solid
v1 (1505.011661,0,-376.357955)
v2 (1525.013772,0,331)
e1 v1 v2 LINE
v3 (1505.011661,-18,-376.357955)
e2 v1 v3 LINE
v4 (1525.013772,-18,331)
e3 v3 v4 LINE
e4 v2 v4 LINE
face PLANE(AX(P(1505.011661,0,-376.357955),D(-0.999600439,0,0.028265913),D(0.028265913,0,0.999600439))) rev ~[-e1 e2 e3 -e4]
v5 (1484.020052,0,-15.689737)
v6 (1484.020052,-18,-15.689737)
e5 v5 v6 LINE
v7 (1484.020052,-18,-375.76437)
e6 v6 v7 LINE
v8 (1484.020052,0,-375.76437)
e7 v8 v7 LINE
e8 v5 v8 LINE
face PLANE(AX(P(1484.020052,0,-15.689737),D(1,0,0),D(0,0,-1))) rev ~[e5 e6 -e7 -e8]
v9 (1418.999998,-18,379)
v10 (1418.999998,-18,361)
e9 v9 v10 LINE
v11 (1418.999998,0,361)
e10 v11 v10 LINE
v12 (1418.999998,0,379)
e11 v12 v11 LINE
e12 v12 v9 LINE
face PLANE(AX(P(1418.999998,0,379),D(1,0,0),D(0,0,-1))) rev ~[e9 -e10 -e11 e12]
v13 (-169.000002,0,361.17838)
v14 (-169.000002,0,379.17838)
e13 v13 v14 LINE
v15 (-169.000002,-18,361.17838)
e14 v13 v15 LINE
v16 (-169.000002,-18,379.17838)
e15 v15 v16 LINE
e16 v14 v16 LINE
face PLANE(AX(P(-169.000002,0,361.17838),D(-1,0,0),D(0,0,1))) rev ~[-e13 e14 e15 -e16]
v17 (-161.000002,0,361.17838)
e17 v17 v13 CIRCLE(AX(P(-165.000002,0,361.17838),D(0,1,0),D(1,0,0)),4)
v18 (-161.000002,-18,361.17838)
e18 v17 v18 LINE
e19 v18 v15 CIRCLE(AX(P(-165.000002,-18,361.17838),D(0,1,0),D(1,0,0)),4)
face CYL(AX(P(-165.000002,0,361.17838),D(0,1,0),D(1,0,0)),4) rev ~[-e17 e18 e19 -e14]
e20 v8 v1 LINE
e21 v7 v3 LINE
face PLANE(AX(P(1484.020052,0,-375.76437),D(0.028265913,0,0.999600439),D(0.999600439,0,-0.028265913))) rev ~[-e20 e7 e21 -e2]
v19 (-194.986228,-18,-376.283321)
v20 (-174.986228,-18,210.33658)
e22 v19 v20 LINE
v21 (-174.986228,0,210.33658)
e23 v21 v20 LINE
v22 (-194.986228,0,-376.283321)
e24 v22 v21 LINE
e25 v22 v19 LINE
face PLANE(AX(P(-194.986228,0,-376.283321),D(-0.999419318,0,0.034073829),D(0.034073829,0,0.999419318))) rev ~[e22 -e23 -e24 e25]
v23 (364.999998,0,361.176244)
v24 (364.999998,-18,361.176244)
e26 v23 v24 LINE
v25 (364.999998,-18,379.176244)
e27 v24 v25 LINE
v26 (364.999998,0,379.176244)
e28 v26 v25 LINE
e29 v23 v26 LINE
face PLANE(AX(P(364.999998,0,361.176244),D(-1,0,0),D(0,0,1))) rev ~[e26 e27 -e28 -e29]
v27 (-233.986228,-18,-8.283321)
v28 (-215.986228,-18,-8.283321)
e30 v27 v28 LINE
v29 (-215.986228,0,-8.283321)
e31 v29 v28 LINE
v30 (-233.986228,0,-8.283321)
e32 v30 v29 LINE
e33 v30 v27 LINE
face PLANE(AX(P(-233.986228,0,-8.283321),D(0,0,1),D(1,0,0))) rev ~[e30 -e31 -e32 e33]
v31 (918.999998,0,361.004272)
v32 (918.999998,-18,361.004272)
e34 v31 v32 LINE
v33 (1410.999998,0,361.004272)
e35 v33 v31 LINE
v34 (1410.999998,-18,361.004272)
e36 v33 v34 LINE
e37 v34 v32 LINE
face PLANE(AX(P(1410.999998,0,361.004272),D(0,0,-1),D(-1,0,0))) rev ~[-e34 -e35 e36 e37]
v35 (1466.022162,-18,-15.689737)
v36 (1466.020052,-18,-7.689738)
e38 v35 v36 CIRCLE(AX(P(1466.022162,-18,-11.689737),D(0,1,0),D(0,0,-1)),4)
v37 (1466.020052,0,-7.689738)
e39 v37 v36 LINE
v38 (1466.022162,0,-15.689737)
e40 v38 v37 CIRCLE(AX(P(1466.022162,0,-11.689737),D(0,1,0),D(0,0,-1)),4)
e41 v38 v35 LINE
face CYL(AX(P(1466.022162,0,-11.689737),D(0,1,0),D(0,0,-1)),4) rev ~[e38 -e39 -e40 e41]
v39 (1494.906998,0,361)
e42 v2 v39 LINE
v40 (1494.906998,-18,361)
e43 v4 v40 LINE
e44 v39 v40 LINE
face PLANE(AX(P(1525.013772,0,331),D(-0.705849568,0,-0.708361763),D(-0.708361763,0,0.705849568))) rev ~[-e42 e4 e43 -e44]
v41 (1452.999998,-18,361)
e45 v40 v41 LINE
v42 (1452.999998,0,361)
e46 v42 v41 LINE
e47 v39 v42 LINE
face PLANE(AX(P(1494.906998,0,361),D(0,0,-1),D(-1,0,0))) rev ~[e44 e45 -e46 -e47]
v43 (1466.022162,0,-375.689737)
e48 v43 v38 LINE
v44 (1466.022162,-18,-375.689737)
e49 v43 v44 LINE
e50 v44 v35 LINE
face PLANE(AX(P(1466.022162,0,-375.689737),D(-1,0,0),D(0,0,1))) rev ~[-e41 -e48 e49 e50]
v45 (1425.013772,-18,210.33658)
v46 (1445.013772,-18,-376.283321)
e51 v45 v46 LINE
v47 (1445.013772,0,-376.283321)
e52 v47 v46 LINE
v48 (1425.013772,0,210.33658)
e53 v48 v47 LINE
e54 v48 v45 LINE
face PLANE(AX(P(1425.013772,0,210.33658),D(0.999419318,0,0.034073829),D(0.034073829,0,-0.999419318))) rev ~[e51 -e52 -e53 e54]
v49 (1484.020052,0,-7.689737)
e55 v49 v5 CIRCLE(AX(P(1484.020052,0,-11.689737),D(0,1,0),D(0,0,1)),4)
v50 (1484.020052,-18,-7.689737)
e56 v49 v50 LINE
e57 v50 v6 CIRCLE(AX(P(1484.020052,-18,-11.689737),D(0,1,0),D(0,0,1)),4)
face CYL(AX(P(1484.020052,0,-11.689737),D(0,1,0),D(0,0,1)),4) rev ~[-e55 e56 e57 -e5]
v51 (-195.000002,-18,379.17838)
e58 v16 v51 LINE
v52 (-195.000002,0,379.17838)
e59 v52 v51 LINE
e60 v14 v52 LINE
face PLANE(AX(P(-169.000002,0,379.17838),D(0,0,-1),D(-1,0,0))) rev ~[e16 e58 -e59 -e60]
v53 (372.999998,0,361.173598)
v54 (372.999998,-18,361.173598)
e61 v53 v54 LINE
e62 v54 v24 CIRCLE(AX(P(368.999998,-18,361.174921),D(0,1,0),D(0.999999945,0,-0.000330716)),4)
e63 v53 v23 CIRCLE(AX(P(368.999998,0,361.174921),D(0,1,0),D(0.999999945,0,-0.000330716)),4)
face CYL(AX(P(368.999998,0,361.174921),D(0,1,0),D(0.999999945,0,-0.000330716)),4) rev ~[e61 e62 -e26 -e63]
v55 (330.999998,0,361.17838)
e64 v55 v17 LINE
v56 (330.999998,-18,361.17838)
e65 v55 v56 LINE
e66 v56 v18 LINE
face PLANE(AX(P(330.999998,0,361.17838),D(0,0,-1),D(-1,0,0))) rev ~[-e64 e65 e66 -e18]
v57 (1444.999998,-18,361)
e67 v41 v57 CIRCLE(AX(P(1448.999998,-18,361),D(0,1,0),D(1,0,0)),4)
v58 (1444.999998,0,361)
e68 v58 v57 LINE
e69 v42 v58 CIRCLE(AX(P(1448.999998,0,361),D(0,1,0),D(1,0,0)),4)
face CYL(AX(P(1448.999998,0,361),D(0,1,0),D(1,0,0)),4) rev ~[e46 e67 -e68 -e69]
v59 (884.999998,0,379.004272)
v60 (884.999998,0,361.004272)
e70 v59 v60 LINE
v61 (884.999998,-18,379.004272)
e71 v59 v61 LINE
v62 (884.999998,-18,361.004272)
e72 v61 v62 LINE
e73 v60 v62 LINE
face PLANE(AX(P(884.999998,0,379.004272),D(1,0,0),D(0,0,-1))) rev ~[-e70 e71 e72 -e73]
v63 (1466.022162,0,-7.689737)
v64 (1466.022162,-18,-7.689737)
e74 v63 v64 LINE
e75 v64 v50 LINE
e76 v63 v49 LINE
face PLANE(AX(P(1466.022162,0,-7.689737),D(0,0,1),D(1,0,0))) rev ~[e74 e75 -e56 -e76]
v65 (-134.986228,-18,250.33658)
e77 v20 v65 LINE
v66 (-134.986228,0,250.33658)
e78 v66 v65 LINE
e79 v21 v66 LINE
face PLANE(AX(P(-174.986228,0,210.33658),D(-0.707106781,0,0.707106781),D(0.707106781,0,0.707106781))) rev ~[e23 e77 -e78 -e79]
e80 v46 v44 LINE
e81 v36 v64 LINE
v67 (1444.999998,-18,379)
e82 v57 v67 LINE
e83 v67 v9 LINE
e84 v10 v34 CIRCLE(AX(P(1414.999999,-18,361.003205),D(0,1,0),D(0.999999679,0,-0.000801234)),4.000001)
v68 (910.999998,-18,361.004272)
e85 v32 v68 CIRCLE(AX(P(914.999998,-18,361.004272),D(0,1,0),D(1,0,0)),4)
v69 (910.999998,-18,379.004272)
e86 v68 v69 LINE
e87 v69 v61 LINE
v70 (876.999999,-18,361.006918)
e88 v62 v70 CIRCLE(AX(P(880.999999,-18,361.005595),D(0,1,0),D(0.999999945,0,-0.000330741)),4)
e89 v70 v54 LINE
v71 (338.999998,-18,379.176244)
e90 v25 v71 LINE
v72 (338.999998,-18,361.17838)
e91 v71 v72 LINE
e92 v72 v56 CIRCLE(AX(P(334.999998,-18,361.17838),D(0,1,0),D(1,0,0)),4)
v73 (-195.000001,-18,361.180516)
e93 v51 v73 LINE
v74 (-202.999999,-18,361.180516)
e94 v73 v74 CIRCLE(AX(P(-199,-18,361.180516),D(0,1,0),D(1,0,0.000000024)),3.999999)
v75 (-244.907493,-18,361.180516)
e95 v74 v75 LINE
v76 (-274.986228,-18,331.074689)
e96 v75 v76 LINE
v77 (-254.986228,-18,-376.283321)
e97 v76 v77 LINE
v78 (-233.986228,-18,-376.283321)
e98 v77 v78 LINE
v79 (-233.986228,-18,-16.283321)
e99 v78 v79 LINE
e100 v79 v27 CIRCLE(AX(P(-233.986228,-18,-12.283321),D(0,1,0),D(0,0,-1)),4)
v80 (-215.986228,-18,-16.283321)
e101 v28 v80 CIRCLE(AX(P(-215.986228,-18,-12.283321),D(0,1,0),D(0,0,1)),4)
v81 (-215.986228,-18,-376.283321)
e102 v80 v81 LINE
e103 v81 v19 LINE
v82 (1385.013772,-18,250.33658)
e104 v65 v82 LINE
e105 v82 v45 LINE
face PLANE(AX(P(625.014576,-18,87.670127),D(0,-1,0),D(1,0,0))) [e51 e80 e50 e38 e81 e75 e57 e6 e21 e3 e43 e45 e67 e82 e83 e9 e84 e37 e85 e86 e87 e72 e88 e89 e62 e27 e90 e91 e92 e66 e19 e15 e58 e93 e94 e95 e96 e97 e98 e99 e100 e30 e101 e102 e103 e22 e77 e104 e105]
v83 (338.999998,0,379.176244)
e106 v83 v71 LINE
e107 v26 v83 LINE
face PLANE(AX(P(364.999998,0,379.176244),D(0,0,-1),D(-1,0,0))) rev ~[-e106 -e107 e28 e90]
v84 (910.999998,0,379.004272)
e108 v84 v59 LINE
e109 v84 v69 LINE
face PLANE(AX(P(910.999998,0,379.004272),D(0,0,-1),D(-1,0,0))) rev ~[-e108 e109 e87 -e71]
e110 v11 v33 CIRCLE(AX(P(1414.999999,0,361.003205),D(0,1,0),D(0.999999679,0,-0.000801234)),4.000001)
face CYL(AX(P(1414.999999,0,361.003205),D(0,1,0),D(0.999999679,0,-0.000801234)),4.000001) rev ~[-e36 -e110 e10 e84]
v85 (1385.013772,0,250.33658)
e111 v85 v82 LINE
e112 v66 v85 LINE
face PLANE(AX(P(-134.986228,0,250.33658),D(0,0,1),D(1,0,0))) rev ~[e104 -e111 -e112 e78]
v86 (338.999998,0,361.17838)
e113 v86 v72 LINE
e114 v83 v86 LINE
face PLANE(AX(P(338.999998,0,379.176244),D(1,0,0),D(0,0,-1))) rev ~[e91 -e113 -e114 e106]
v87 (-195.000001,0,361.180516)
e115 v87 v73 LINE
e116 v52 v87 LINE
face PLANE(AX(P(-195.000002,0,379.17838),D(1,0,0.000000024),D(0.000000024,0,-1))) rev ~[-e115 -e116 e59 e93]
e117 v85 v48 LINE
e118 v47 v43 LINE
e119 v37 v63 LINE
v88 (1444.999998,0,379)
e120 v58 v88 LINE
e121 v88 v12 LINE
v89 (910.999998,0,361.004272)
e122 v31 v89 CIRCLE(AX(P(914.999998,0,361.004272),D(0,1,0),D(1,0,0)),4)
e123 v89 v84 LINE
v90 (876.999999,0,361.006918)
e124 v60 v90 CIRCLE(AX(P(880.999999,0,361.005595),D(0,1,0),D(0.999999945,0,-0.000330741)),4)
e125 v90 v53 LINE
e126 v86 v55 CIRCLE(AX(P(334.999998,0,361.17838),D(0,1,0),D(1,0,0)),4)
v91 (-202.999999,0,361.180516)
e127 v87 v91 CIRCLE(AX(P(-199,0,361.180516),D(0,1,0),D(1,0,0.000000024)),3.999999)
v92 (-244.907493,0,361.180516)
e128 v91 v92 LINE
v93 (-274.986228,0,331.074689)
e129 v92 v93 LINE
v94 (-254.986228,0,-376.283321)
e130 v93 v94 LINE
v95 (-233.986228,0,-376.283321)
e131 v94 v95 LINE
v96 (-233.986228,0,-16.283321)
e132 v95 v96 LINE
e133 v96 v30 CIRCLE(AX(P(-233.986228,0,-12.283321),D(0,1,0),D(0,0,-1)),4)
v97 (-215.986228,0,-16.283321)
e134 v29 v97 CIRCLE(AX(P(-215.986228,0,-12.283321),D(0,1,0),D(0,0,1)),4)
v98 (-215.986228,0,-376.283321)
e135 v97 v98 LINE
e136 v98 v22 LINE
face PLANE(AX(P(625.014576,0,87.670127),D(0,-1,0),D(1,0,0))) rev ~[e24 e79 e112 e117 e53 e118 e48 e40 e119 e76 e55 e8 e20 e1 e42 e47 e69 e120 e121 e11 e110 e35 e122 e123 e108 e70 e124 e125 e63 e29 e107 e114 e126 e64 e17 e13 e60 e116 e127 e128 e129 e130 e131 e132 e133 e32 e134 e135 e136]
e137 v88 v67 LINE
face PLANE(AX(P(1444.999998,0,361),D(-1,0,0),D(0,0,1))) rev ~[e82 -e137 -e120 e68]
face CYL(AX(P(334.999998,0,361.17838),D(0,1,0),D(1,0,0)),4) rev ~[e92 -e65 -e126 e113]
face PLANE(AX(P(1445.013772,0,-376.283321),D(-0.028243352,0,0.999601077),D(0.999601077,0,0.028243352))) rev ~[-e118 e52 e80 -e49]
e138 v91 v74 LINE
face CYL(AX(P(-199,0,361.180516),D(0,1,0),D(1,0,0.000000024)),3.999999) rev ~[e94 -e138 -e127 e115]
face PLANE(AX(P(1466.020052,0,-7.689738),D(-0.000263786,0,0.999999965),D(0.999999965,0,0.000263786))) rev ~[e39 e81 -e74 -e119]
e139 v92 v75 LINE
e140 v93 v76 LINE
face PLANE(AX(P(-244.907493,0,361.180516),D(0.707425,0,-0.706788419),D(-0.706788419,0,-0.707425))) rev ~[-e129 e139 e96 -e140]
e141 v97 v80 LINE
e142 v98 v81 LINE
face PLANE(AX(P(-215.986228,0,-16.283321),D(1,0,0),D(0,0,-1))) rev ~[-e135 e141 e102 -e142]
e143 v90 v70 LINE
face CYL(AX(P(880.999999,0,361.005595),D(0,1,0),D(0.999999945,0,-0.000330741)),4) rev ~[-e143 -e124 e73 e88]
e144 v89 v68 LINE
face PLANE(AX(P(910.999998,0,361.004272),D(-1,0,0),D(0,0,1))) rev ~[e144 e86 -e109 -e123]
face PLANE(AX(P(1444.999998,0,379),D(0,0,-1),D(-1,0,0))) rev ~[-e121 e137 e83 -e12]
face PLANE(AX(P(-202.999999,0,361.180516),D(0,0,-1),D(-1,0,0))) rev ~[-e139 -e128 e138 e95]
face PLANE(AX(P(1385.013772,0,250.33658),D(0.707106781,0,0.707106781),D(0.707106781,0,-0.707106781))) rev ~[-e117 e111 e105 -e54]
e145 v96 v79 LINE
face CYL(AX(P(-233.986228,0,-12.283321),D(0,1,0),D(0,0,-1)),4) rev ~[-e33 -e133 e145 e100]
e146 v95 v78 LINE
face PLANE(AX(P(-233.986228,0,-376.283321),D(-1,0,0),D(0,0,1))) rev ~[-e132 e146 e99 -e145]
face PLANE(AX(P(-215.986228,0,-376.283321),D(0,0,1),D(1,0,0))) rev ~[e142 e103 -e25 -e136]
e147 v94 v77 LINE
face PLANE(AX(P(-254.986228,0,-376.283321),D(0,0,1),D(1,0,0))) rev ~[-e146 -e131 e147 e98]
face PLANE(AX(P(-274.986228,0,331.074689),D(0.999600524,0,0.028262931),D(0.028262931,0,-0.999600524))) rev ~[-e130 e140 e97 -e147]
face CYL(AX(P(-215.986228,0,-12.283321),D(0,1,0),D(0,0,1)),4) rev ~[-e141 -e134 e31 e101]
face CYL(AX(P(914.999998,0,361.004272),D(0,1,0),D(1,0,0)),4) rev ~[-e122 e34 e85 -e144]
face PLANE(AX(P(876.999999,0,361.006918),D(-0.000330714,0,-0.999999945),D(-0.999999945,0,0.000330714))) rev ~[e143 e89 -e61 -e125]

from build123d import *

# Parameters (mm, degrees)
F1_DEPTH = 18


# Not quite as in the source:
# - ends of sketch curves that miss each other by under 0.0002 mm in the source are joined


with BuildPart() as f1:
    # F0 (on Front) → F1 (new body)
    with BuildSketch(Plane.XZ):
        with BuildLine():
            Line((1444.9999982887, 361), (1444.9999982887, 379))
            Line((1444.9999982887, 379), (1418.9999982887, 379))
            Line((1418.9999982887, 379), (1418.9999982887, 361.0032042947))
            Line((1418.9999982887, 361.0032042947), (1418.9999982887, 361))
            ThreePointArc((1418.9999982887, 361), (1414.9978620926, 357.0032048651), (1410.9999984313, 361.0042723931))
            Line((1410.9999984313, 361.0042723931), (918.9999984313, 361.0042723931))
            ThreePointArc((918.9999984313, 361.0042723931), (914.9999984313, 357.0042723931), (910.9999984313, 361.0042723931))
            Line((910.9999984313, 361.0042723931), (910.9999984313, 379.0042723931))
            Line((910.9999984313, 379.0042723931), (884.9999984313, 379.0042723931))
            Line((884.9999984313, 379.0042723931), (884.9999984313, 361.0055952483))
            Line((884.9999984313, 361.0055952483), (884.9999984313, 361.0042723931))
            ThreePointArc((884.9999984313, 361.0042723931), (880.9986755762, 357.005595467), (876.9999986501, 361.0069181034))
            Line((876.9999986501, 361.0069181034), (372.9999978512, 361.1735978616))
            ThreePointArc((372.9999978512, 361.1735978616), (368.9986752099, 357.1749209454), (364.9999982887, 361.1762435819))
            Line((364.9999982887, 361.1762435819), (364.9999982887, 379.1762435819))
            Line((364.9999982887, 379.1762435819), (338.9999982887, 379.1762435819))
            Line((338.9999982887, 379.1762435819), (338.9999982887, 361.1783797782))
            ThreePointArc((338.9999982887, 361.1783797782), (334.9999982887, 357.1783797782), (330.9999982887, 361.1783797782))
            Line((330.9999982887, 361.1783797782), (-161.0000017113, 361.1783797782))
            ThreePointArc((-161.0000017113, 361.1783797782), (-165.0000017113, 357.1783797782), (-169.0000017113, 361.1783797782))
            Line((-169.0000017113, 361.1783797782), (-169.0000017113, 379.1783797782))
            Line((-169.0000017113, 379.1783797782), (-195.0000017113, 379.1783797782))
            Line((-195.0000017113, 379.1783797782), (-195.0000012844, 361.180516095))
            ThreePointArc((-195.0000012844, 361.180516095), (-198.9999999526, 357.1805172846), (-202.9999987156, 361.1805160001))
            Line((-202.9999987156, 361.1805160001), (-215.9862284595, 361.1805160001))
            Line((-215.9862284595, 361.1805160001), (-233.9862284595, 361.1805160001))
            Line((-233.9862284595, 361.1805160001), (-244.90749278, 361.1805160001))
            Line((-244.90749278, 361.1805160001), (-274.9862284595, 331.0746893941))
            Line((-274.9862284595, 331.0746893941), (-254.9862284595, -376.2833213137))
            Line((-254.9862284595, -376.2833213137), (-233.9862284595, -376.2833213137))
            Line((-233.9862284595, -376.2833213137), (-233.9862284595, -16.2833213137))
            ThreePointArc((-233.9862284595, -16.2833213137), (-237.9862284595, -12.2833213137), (-233.9862284595, -8.2833213137))
            Line((-233.9862284595, -8.2833213137), (-215.9862284595, -8.2833213137))
            ThreePointArc((-215.9862284595, -8.2833213137), (-211.9862284595, -12.2833213137), (-215.9862284595, -16.2833213137))
            Line((-215.9862284595, -16.2833213137), (-215.9862284595, -376.2833213137))
            Line((-215.9862284595, -376.2833213137), (-194.9862284595, -376.2833213137))
            Line((-194.9862284595, -376.2833213137), (-174.9862284595, 210.3365797868))
            Line((-174.9862284595, 210.3365797868), (-134.9862284595, 250.3365797868))
            Line((-134.9862284595, 250.3365797868), (1385.0137715405, 250.3365797868))
            Line((1385.0137715405, 250.3365797868), (1425.0137715405, 210.3365797868))
            Line((1425.0137715405, 210.3365797868), (1445.0137715405, -376.2833213137))
            Line((1445.0137715405, -376.2833213137), (1466.022162316, -375.6897371419))
            Line((1466.022162316, -375.6897371419), (1466.022162316, -15.6897371419))
            ThreePointArc((1466.022162316, -15.6897371419), (1462.0221624552, -11.6907923518), (1466.0200518963, -7.6897376986))
            Line((1466.0200518963, -7.6897376986), (1466.022162316, -7.6897371419))
            Line((1466.022162316, -7.6897371419), (1484.020051896, -7.6897371419))
            ThreePointArc((1484.020051896, -7.6897371419), (1488.020051896, -11.6897371419), (1484.020051896, -15.6897371419))
            Line((1484.020051896, -15.6897371419), (1484.020051896, -375.7643703854))
            Line((1484.020051896, -375.7643703854), (1505.0116611204, -376.3579545571))
            Line((1505.0116611204, -376.3579545571), (1525.0137715405, 331))
            Line((1525.0137715405, 331), (1494.9069982887, 361))
            Line((1494.9069982887, 361), (1466.022162316, 361))
            Line((1466.022162316, 361), (1452.9999982887, 361))
            ThreePointArc((1452.9999982887, 361), (1448.9999982887, 357), (1444.9999982887, 361))
        make_face()
    extrude(amount=F1_DEPTH)


solid = f1.part
